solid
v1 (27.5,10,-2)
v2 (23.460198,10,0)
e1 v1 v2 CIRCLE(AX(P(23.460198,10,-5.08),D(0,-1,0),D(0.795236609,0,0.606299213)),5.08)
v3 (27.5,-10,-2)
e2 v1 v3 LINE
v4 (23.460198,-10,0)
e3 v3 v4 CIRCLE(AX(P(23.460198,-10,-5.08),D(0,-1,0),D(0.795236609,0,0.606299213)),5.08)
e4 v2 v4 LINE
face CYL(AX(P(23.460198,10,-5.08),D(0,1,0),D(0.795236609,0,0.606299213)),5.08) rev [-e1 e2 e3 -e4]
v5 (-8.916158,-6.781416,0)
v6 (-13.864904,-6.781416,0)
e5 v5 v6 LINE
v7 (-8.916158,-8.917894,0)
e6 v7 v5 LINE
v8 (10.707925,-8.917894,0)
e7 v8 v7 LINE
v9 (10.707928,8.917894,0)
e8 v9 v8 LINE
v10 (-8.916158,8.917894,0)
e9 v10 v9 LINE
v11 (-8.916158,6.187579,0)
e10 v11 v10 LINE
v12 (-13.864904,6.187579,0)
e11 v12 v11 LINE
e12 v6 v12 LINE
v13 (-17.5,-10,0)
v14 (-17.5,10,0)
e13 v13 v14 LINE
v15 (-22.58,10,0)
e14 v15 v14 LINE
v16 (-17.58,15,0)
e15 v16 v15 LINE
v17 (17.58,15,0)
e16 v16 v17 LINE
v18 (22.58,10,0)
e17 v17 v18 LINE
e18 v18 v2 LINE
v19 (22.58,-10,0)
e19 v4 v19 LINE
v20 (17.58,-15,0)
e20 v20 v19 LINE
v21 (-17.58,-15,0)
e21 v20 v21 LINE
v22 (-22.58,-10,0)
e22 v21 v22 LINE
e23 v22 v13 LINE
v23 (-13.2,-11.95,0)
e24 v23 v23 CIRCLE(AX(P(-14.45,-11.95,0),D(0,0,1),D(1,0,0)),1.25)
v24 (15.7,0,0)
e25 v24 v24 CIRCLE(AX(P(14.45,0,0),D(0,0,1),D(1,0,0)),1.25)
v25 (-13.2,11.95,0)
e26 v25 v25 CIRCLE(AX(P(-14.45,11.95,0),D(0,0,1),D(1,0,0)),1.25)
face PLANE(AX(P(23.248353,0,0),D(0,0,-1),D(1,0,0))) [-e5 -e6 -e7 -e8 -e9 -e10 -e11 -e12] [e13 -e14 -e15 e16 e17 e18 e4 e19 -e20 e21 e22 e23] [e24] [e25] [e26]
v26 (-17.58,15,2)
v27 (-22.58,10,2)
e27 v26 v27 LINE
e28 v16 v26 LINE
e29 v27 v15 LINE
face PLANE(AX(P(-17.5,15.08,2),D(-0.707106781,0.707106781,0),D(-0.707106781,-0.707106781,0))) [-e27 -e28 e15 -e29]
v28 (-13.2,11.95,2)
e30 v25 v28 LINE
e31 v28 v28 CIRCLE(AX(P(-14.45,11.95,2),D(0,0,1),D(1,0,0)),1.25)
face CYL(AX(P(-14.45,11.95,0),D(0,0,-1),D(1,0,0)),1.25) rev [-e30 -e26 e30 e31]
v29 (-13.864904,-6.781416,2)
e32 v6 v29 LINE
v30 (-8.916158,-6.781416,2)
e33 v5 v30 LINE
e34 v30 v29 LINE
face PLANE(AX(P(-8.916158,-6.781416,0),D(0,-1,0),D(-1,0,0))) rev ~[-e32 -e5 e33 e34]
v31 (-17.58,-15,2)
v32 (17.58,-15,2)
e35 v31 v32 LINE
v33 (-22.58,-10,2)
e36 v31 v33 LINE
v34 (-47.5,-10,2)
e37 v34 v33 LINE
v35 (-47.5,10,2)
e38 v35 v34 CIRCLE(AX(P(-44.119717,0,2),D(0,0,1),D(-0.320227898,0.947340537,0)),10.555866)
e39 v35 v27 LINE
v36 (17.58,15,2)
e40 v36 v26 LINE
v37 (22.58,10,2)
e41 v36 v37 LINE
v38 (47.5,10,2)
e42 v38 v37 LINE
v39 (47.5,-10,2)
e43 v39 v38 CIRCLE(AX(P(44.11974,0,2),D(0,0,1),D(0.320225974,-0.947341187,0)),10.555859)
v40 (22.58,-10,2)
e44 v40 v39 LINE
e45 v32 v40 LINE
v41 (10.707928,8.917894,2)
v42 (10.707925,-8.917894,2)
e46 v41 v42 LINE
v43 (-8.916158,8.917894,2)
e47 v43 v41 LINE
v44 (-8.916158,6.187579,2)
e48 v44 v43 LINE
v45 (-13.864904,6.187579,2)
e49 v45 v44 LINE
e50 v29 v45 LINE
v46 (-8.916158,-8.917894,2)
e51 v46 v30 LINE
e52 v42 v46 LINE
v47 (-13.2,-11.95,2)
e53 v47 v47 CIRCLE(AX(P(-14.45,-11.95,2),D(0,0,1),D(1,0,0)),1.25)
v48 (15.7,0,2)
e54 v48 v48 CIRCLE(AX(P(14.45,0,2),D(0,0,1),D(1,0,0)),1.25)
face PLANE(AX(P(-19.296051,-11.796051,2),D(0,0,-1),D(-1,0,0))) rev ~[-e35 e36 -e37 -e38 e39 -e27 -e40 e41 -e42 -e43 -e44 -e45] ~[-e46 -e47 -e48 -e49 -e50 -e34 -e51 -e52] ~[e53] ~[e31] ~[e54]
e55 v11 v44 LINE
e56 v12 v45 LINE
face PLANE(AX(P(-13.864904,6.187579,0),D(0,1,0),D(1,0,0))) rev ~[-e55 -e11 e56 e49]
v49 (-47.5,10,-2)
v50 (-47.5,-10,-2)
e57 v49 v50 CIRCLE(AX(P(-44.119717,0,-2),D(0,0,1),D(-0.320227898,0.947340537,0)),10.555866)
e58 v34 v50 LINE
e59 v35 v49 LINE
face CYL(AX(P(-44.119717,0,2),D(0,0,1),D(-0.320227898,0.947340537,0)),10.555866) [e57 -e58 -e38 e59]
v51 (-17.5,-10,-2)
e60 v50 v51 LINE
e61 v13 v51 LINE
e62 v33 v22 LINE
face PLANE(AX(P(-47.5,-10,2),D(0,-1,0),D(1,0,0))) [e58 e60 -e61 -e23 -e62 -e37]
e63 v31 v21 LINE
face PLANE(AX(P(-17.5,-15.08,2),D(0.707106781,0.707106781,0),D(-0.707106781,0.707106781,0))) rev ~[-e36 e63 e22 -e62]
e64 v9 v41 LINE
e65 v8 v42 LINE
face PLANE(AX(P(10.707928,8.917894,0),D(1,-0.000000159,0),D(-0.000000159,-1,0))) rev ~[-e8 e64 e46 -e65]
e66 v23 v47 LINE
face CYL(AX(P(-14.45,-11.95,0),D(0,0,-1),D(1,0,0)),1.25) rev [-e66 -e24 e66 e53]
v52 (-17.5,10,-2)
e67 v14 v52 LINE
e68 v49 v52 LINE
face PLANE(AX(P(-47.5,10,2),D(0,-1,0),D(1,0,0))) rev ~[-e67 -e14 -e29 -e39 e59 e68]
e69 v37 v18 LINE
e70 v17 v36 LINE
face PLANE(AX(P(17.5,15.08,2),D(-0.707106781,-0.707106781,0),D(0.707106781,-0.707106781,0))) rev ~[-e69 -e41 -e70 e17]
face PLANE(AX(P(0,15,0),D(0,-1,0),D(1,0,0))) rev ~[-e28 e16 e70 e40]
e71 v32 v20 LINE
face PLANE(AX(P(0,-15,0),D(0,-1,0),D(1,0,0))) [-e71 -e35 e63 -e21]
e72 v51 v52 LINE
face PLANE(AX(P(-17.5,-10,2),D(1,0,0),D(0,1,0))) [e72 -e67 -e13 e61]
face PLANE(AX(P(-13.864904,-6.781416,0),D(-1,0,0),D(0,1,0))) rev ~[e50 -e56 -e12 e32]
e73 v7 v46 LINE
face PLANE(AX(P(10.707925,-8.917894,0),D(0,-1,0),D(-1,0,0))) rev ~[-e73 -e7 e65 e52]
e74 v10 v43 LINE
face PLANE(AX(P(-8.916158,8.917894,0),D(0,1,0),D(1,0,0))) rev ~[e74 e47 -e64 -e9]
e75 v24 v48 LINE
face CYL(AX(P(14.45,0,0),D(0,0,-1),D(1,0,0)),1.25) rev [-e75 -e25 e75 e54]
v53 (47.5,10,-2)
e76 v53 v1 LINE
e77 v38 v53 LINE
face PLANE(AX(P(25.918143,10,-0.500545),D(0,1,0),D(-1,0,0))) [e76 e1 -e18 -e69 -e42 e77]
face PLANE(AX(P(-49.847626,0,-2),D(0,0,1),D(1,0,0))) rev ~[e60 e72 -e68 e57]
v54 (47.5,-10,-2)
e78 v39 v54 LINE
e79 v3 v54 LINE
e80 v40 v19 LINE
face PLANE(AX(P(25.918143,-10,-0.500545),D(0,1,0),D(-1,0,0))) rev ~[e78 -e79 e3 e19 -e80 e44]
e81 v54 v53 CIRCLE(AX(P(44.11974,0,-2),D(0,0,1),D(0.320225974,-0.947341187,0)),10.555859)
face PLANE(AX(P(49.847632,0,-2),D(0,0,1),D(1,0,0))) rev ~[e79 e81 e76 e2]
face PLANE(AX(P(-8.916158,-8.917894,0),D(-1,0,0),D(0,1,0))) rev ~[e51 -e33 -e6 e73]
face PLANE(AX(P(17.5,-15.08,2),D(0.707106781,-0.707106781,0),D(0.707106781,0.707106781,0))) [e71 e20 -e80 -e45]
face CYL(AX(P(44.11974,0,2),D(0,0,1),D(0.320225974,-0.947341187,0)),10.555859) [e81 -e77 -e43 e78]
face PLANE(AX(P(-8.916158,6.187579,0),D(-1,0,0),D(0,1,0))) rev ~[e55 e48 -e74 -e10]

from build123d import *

# Parameters (mm, degrees)
F0_W         = 35
F0_H         = 30
F0_R         = 1.25
F1_DEPTH     = 2
F2_W         = 20
F2_H         = 20
F2_W_2       = 30
F2_W_3       = 10
F3_DEPTH     = 4
F4_T4_DEPTH  = 2
F4_T9_DEPTH  = 2
F4_T14_DEPTH = 2
F4_T19_DEPTH = 2
F6_SIZE      = 5.08
F7_SIZE      = 5.08
F9_DEPTH     = 2
F10_T1_DEPTH = 20


# Not quite as in the source:
# - a fillet or chamfer that OpenCascade refuses, or shapes differently, is made with other operations: its cross-section is extruded or revolved along the edge and cut away or added
# - a feature of the source that left no trace in its solid (it failed there, or was rolled back) is left out


with BuildPart() as f1:
    # F0 (on Top) → F1 (new body)
    with BuildSketch(Plane.XY):
        Rectangle(F0_W, F0_H)
        with Locations((-14.45, -11.95)):
            Circle(F0_R, mode=Mode.SUBTRACT)
        Polygon((-8.9161582291, 8.9178942144), (8.9161582291, 8.9178942144), (10.7079278678, 8.9178942144), (10.7079250291, -8.9178942144), (8.9161582291, -8.9178942144), (-8.9161582291, -8.9178942144), (-8.9161582291, -6.7814155482), (-13.8649037108, -6.7814155482), (-13.8649037108, 6.1875791289), (-8.9161582291, 6.1875791289), align=None, mode=Mode.SUBTRACT)
        with Locations((-14.45, 11.95)):
            Circle(F0_R, mode=Mode.SUBTRACT)
        with Locations((14.45, 0)):
            Circle(F0_R, mode=Mode.SUBTRACT)
    extrude(amount=F1_DEPTH)

    # F2 (on face) → F3 (join)
    with BuildSketch(Plane.XY.offset(2)):
        with BuildLine():
            Line((47.5, 10), (47.5, -10))
            ThreePointArc((47.5, -10), (54.6755987692, 0), (47.5, 10))
        make_face()
        with BuildLine():
            ThreePointArc((-47.5, 10), (-54.6755833881, 0), (-47.5, -10))
            Line((-47.5, -10), (-47.5, 10))
        make_face()
        with Locations((37.5, 0)):
            Rectangle(F2_W, F2_H)
        with Locations((-32.5, 0)):
            Rectangle(F2_W_2, F2_H)
        with Locations((22.5, 0)):
            Rectangle(F2_W_3, F2_H)
    extrude(amount=-F3_DEPTH)

    # F4: chamfer of 5.08 on 4 edges, made by hand


with BuildPart() as f4_tool2:
    # F4_s3 → F4_t4 (new body)
    with BuildSketch(Plane.XY.offset(2)):
        Polygon((-17.5, 15.08), (-22.58, 10), (-17.5, 10), align=None)
    extrude(amount=-F4_T4_DEPTH)

    split(bisect_by=Plane.XZ.offset(-15), keep=Keep.TOP)


with BuildPart() as f1_1:
    add(f1.part)

    # F4_t1: union F4_tool2
    add(f4_tool2.part)


with BuildPart() as f4_tool7:
    # F4_s8 → F4_t9 (new body)
    with BuildSketch(Plane.XY.offset(2)):
        Polygon((17.5, -15.08), (22.58, -10), (17.5, -10), align=None)
    extrude(amount=-F4_T9_DEPTH)

    split(bisect_by=Plane.XZ.offset(15), keep=Keep.BOTTOM)


with BuildPart() as f1_2:
    add(f1_1.part)

    # F4_t6: union F4_tool7
    add(f4_tool7.part)


with BuildPart() as f4_tool12:
    # F4_s13 → F4_t14 (new body)
    with BuildSketch(Plane.XY.offset(2)):
        Polygon((17.5, 15.08), (22.58, 10), (17.5, 10), align=None)
    extrude(amount=-F4_T14_DEPTH)

    split(bisect_by=Plane.XZ.offset(-15), keep=Keep.TOP)


with BuildPart() as f1_3:
    add(f1_2.part)

    # F4_t11: union F4_tool12
    add(f4_tool12.part)


with BuildPart() as f4_tool17:
    # F4_s18 → F4_t19 (new body)
    with BuildSketch(Plane.XY.offset(2)):
        Polygon((-17.5, -15.08), (-22.58, -10), (-17.5, -10), align=None)
    extrude(amount=-F4_T19_DEPTH)

    split(bisect_by=Plane.XZ.offset(15), keep=Keep.BOTTOM)


with BuildPart() as f1_4:
    add(f1_3.part)

    # F4_t16: union F4_tool17
    add(f4_tool17.part)

    # F6
    f6_edges = [f1_4.edges().sort_by_distance(p)[0] for p in [
        (17.5, -10, -1),
    ]]
    chamfer(f6_edges, length=F6_SIZE)

    # F7
    f7_edges = [f1_4.edges().sort_by_distance(p)[0] for p in [
        (17.5, 10, -1),
    ]]
    chamfer(f7_edges, length=F7_SIZE)

    # F8 (on face) → F9 (cut)
    with BuildSketch(Plane(origin=(0, 0, -2), x_dir=(1, 0, 0), z_dir=(0, 0, -1))):
        Polygon((27.5, -10), (27.5, 10), (22.58, 10), (17.5, 4.92), (17.5, -4.92), (22.58, -10), align=None)
    extrude(amount=-F9_DEPTH, mode=Mode.SUBTRACT)

    # F10: fillet of radius 5.08 on 1 edges, made by hand

    # F10_s2 → F10_t1 (join)
    with BuildSketch(Plane.XZ.offset(-10)):
        with BuildLine():
            ThreePointArc((27.5, -2), (25.7140835586, -0.5273743839), (23.4601980247, 0))
            Line((23.4601980247, 0), (27.5, 0))
            Line((27.5, 0), (27.5, -2))
        make_face()
    extrude(amount=F10_T1_DEPTH)


solid = f1_4.part
